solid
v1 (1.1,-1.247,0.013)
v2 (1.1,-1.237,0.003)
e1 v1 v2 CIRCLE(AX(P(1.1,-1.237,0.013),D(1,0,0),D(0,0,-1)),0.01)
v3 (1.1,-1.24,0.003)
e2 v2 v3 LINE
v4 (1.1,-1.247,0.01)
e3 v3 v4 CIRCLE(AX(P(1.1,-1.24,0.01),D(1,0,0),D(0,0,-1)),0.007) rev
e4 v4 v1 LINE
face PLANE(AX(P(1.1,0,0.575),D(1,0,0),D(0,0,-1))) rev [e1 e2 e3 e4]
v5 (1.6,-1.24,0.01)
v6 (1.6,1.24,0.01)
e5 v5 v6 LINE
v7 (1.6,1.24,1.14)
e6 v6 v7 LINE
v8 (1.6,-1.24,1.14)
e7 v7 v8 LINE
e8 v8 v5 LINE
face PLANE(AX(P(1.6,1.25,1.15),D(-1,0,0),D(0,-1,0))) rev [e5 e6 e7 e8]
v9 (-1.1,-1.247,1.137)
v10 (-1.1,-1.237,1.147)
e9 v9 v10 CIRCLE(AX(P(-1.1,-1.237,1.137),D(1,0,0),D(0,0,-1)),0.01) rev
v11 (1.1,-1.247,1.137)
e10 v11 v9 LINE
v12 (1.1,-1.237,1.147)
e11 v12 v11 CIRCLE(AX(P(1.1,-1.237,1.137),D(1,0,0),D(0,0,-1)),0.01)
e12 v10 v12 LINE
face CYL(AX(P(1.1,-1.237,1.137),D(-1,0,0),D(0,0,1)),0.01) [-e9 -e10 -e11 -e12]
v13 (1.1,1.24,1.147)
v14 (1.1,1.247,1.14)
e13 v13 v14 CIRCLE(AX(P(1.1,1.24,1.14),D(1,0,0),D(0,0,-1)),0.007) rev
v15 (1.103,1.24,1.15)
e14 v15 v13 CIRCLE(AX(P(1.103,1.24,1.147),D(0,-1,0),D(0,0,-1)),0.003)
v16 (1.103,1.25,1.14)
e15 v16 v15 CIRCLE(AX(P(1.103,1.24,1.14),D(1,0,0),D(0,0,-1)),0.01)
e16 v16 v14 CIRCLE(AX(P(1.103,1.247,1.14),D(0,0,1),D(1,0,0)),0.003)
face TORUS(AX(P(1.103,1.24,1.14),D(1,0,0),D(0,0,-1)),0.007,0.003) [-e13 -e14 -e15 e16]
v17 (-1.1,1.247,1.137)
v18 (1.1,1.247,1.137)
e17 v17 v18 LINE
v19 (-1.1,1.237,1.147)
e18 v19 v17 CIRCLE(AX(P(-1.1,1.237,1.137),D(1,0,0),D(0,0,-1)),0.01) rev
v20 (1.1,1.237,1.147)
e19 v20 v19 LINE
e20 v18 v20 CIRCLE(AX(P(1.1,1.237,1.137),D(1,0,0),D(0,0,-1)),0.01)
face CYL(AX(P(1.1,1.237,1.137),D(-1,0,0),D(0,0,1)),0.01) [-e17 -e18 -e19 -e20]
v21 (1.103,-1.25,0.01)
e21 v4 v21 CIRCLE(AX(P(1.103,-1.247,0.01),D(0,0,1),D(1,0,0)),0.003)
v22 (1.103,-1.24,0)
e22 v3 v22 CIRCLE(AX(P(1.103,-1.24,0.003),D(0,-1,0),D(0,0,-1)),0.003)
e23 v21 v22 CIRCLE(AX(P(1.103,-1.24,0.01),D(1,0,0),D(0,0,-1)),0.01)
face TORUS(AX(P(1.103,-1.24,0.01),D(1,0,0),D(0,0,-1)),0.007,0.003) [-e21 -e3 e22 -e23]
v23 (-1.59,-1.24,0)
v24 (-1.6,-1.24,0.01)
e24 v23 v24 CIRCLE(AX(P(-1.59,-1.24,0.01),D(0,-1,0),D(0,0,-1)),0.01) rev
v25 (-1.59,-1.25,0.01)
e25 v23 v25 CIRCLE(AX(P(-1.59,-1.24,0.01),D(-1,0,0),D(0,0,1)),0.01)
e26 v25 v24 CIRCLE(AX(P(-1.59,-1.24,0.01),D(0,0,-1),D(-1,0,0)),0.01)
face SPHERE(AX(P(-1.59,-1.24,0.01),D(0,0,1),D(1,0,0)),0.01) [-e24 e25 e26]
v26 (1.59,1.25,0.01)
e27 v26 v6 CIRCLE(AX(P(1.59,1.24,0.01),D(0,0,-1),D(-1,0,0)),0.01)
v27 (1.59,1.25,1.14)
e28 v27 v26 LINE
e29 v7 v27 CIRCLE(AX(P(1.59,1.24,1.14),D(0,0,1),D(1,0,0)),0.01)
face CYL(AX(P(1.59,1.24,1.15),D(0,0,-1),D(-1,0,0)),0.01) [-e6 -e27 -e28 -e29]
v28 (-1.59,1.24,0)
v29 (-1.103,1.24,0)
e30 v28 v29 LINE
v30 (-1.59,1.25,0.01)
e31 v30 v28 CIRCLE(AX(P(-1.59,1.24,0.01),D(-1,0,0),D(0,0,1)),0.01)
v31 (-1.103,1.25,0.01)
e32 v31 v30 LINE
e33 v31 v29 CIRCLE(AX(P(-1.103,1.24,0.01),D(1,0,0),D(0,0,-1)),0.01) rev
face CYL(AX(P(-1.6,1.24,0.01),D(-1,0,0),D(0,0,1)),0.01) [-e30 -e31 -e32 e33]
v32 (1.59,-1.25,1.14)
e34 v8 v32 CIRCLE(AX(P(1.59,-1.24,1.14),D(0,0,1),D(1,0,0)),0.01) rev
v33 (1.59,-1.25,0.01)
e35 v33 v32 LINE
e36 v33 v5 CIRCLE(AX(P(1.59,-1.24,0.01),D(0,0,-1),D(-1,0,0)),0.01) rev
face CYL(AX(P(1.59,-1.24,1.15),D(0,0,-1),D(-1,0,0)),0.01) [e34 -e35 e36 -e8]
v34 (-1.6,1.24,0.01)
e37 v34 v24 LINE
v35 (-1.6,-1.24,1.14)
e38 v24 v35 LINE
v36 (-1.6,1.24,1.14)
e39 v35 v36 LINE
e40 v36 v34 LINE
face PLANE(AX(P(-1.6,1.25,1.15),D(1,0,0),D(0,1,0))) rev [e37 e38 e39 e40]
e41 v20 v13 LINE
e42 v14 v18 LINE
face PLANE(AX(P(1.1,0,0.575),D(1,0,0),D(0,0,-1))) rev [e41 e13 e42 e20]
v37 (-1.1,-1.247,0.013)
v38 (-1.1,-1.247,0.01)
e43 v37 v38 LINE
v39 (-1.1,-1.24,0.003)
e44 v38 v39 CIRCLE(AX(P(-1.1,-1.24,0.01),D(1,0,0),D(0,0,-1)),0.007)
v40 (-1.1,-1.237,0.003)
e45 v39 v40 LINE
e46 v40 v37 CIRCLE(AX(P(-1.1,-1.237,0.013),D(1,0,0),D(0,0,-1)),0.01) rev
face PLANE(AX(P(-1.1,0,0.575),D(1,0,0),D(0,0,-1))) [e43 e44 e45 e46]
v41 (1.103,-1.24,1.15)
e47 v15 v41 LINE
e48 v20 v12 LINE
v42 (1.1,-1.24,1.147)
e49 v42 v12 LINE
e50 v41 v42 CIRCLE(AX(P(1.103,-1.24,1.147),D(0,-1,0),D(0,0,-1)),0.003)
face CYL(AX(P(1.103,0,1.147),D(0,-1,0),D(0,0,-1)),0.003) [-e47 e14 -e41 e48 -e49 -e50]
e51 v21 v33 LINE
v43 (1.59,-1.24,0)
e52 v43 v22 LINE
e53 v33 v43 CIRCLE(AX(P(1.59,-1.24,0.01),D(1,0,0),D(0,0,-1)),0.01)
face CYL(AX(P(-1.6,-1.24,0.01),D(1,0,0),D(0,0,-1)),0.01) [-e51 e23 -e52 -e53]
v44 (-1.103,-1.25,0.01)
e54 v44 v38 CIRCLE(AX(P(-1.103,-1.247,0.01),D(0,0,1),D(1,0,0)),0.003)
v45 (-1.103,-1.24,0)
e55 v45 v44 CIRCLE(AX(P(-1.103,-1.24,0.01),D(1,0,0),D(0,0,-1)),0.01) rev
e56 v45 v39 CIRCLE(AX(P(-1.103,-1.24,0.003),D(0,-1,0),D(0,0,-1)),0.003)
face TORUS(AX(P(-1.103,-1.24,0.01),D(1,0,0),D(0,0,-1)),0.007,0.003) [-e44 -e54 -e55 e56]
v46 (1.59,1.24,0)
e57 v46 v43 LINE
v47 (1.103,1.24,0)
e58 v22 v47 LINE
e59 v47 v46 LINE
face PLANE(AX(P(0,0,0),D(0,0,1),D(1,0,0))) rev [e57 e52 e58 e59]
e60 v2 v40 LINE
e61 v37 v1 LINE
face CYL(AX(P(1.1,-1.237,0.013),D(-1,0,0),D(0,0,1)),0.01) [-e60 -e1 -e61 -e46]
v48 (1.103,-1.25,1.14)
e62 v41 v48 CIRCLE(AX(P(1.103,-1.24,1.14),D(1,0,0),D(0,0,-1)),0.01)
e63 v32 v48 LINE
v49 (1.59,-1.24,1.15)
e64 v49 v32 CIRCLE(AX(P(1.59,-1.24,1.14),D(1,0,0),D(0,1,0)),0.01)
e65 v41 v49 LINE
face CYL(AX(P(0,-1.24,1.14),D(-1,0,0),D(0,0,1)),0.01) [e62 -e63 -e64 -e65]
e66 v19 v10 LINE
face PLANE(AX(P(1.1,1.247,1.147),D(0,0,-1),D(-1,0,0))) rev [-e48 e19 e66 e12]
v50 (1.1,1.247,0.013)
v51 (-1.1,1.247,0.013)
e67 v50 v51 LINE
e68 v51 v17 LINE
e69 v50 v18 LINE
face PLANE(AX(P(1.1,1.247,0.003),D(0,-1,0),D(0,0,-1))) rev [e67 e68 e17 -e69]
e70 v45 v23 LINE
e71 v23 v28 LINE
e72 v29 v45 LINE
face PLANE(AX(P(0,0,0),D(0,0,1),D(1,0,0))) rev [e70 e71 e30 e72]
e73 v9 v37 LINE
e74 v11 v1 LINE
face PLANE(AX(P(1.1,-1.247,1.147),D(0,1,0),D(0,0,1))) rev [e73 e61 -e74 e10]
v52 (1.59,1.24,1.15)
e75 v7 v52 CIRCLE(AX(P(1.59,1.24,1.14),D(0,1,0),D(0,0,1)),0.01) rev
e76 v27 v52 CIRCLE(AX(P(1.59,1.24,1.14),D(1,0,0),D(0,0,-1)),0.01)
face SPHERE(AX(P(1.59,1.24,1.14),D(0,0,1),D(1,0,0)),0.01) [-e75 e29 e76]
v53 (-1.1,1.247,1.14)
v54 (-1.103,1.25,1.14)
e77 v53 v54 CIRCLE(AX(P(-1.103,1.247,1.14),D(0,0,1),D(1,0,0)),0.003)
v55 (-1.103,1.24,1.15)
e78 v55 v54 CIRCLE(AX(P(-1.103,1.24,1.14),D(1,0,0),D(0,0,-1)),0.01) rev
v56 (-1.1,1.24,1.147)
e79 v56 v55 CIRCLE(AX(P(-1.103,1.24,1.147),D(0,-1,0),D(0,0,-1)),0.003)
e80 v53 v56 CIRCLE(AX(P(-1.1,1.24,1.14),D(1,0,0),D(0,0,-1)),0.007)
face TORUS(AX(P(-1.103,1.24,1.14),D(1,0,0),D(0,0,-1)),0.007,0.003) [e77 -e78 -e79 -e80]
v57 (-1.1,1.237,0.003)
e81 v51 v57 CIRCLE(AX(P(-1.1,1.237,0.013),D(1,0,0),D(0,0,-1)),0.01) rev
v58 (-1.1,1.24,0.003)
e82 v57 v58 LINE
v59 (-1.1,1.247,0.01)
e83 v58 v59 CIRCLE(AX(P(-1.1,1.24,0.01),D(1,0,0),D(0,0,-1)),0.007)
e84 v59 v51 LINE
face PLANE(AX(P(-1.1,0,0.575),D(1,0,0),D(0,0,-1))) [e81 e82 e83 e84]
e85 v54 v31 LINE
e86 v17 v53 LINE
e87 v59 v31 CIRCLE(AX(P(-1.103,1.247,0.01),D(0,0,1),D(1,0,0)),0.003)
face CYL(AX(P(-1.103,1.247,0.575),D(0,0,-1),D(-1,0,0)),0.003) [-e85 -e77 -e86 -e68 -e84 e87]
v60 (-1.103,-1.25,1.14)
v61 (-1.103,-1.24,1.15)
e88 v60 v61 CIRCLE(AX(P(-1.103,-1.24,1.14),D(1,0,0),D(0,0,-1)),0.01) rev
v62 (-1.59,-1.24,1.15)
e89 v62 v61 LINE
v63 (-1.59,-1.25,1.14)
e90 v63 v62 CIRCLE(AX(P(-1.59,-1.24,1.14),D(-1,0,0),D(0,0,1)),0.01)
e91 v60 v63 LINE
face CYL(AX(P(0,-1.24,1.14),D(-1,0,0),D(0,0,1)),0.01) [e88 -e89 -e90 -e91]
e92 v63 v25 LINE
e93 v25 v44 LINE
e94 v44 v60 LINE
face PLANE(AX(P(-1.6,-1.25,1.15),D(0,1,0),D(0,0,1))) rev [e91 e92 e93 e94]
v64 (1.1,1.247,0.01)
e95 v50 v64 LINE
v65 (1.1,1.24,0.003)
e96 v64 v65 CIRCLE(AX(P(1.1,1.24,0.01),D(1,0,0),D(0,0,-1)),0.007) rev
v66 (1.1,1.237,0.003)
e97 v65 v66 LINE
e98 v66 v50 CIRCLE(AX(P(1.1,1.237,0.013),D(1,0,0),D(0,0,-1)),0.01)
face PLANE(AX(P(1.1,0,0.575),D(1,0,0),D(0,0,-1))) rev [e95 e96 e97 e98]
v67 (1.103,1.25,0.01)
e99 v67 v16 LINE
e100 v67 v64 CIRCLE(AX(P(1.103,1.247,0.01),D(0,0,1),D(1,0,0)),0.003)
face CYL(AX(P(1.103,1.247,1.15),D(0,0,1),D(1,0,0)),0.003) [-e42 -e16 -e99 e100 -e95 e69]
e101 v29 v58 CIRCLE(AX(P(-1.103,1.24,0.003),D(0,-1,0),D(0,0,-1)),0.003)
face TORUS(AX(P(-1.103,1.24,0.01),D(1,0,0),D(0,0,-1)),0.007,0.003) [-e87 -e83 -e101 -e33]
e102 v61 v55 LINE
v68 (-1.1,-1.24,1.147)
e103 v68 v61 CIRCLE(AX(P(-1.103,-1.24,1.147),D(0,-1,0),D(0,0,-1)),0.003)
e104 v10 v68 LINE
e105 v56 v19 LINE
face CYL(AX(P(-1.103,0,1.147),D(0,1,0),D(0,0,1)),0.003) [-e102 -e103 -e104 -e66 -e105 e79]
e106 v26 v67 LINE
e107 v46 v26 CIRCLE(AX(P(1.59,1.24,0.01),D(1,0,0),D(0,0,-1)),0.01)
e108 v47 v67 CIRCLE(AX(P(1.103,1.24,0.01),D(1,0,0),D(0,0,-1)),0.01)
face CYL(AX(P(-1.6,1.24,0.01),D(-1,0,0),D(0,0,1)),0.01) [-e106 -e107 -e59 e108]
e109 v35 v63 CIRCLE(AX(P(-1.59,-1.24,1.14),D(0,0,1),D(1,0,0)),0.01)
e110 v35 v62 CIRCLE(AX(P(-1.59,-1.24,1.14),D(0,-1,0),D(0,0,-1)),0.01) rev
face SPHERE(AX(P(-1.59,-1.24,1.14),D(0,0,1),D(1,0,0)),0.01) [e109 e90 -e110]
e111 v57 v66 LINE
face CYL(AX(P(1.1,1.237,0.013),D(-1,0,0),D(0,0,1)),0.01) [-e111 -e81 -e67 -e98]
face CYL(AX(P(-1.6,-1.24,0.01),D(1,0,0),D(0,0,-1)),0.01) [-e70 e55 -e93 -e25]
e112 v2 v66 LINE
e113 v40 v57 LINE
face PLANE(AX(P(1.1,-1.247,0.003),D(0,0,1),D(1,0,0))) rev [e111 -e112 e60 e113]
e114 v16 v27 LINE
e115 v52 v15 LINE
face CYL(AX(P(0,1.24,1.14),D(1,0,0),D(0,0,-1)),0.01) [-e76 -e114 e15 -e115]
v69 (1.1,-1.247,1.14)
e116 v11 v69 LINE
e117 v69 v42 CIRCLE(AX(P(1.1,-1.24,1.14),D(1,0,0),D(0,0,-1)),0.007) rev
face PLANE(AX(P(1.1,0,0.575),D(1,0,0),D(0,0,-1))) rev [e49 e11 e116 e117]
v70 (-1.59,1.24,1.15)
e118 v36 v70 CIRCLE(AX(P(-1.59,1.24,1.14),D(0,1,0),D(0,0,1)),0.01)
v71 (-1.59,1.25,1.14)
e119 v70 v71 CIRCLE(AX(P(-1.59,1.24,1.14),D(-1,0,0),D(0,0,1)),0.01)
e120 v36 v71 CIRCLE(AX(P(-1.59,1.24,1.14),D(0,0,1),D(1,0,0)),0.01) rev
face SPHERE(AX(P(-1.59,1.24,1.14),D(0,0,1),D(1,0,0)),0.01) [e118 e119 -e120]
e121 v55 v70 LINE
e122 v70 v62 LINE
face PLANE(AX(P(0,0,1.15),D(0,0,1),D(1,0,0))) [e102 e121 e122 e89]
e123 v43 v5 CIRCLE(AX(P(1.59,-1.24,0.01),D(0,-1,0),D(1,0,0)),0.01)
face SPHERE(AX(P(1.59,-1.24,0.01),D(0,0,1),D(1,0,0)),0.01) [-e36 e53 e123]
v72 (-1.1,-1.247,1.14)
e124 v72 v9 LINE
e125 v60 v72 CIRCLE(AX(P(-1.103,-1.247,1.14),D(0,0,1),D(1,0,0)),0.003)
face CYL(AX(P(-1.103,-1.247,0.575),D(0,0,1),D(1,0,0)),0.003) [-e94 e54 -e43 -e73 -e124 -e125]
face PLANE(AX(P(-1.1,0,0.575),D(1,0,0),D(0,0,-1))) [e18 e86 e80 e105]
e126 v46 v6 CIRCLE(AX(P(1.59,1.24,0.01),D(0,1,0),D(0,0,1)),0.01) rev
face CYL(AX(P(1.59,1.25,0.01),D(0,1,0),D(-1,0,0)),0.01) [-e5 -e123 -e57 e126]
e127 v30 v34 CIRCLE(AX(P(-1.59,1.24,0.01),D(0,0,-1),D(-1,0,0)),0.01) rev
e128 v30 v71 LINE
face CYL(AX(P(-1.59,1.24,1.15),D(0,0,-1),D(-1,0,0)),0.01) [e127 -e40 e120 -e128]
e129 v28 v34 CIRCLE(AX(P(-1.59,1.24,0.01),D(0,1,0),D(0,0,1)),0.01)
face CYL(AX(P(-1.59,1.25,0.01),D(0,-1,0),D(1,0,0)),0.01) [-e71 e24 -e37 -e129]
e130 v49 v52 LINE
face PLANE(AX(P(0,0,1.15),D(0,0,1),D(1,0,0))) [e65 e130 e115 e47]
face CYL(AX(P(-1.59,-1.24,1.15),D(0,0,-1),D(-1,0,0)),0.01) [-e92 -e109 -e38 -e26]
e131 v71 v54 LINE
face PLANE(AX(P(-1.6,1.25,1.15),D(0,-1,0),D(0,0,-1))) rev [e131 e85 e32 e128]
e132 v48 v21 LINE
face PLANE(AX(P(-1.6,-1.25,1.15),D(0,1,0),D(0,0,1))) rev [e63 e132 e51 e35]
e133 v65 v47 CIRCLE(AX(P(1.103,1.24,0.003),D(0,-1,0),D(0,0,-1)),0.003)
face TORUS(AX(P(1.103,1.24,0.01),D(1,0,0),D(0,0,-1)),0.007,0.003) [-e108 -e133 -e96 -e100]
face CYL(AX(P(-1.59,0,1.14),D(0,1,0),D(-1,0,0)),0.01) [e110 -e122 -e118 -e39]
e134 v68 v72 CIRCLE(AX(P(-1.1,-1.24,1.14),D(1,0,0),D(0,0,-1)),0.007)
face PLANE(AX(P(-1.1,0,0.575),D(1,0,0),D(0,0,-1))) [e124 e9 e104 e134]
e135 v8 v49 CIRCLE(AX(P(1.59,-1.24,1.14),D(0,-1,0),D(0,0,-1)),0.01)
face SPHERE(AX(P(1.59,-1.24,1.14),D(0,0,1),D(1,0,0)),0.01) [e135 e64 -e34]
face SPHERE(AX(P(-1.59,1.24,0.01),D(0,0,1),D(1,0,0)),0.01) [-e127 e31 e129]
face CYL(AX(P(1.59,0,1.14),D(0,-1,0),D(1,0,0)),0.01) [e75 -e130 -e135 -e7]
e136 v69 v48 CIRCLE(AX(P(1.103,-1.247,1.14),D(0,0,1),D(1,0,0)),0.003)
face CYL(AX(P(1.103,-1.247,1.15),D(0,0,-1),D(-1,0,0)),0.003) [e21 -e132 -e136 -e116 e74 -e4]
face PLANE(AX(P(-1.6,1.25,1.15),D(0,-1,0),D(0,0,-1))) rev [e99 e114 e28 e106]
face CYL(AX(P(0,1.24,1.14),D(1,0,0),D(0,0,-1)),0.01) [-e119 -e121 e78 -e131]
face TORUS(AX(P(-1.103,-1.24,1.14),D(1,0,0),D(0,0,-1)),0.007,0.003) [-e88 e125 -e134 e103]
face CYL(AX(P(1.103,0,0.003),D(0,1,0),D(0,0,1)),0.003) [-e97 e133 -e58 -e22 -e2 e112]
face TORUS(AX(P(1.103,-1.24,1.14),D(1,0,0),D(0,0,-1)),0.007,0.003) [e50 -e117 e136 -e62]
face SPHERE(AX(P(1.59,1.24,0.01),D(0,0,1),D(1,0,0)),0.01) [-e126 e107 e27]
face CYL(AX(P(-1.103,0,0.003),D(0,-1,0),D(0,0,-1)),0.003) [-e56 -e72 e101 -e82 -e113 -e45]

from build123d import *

# Parameters (mm, degrees)
SKETCH1_W                           = 3.2
SKETCH1_H                           = 2.5
ALL_BODY_DEPTH                      = 1.15
CUT_OUT_THE_BODY_FOR_PIN_DEPTH      = 1.1
CUT_OUT_THE_BODY_FOR_PIN_DEPTH_BACK = 1.1
SKETCH2_OUTSIDE_W                   = 3.994
SKETCH2_OUTSIDE_H                   = 5.344
SKETCH2_OUTSIDE_W_2                 = 1.144
SKETCH2_OUTSIDE_H_2                 = 2.494
BODY_FILLET_R                       = 0.01
PIN_FILLET_A_R                      = 0.01
PIN_FILLET_B_R                      = 0.003


with BuildPart() as part:
    # Sketch1 → All body (new body)
    with BuildSketch(Plane.XY):
        Rectangle(SKETCH1_W, SKETCH1_H)
    extrude(amount=ALL_BODY_DEPTH)

    # Sketch2 outside → Cut out the body for pin (cut, two sides: drawn at the far end of the back side and taken through both)
    with BuildSketch(Plane(origin=(0, 0, 0), x_dir=(0, 0, -1), z_dir=(1, 0, 0)).offset(-CUT_OUT_THE_BODY_FOR_PIN_DEPTH_BACK)):
        with Locations((-0.575, 0)):
            Rectangle(SKETCH2_OUTSIDE_W, SKETCH2_OUTSIDE_H)
        with Locations((-0.575, 0)):
            Rectangle(SKETCH2_OUTSIDE_W_2, SKETCH2_OUTSIDE_H_2, mode=Mode.SUBTRACT)
    extrude(amount=CUT_OUT_THE_BODY_FOR_PIN_DEPTH + CUT_OUT_THE_BODY_FOR_PIN_DEPTH_BACK, mode=Mode.SUBTRACT)

    # Body fillet
    body_fillet_edges = [part.edges().sort_by_distance(p)[0] for p in [
        (0, 1.247, 0.003),
        (0, 1.247, 1.147),
        (0, -1.247, 1.147),
        (0, -1.247, 0.003),
    ]]
    fillet(body_fillet_edges, radius=BODY_FILLET_R)

    # Pin fillet a
    pin_fillet_a_edges = [part.edges().sort_by_distance(p)[0] for p in [
        (1.6, 0, 1.15),
        (-1.35, 1.25, 0),
        (1.35, -1.25, 0),
        (1.35, -1.25, 1.15),
        (-1.35, 1.25, 1.15),
        (1.35, 1.25, 1.15),
        (-1.6, 0, 1.15),
        (1.35, 1.25, 0),
        (1.6, 0, 0),
        (-1.35, -1.25, 0),
        (-1.6, 0, 0),
        (-1.6, 1.25, 0.575),
        (1.6, 1.25, 0.575),
        (1.6, -1.25, 0.575),
        (-1.6, -1.25, 0.575),
        (-1.35, -1.25, 1.15),
    ]]
    fillet(pin_fillet_a_edges, radius=PIN_FILLET_A_R)

    # Pin fillet b
    pin_fillet_b_edges = [part.edges().sort_by_distance(p)[0] for p in [
        (1.1, -1.25, 0.575),
        (1.1, 0, 1.15),
        (1.1, 1.25, 0.575),
        (1.1, 0, 0),
        (-1.1, 1.25, 0.575),
        (-1.1, 0, 1.15),
        (-1.1, -1.25, 0.575),
        (-1.1, 0, 0),
        (1.1, 1.247071068, 0.002928932),
        (1.1, -1.247071068, 0.002928932),
        (1.1, -1.247071068, 1.147071068),
        (1.1, 1.247071068, 1.147071068),
        (-1.1, -1.247071068, 1.147071068),
        (-1.1, 1.247071068, 1.147071068),
        (-1.1, -1.247071068, 0.002928932),
        (-1.1, 1.247071068, 0.002928932),
    ]]
    fillet(pin_fillet_b_edges, radius=PIN_FILLET_B_R - 0.0001)  # a hair under: the kernel refuses the full size


solid = part.part
